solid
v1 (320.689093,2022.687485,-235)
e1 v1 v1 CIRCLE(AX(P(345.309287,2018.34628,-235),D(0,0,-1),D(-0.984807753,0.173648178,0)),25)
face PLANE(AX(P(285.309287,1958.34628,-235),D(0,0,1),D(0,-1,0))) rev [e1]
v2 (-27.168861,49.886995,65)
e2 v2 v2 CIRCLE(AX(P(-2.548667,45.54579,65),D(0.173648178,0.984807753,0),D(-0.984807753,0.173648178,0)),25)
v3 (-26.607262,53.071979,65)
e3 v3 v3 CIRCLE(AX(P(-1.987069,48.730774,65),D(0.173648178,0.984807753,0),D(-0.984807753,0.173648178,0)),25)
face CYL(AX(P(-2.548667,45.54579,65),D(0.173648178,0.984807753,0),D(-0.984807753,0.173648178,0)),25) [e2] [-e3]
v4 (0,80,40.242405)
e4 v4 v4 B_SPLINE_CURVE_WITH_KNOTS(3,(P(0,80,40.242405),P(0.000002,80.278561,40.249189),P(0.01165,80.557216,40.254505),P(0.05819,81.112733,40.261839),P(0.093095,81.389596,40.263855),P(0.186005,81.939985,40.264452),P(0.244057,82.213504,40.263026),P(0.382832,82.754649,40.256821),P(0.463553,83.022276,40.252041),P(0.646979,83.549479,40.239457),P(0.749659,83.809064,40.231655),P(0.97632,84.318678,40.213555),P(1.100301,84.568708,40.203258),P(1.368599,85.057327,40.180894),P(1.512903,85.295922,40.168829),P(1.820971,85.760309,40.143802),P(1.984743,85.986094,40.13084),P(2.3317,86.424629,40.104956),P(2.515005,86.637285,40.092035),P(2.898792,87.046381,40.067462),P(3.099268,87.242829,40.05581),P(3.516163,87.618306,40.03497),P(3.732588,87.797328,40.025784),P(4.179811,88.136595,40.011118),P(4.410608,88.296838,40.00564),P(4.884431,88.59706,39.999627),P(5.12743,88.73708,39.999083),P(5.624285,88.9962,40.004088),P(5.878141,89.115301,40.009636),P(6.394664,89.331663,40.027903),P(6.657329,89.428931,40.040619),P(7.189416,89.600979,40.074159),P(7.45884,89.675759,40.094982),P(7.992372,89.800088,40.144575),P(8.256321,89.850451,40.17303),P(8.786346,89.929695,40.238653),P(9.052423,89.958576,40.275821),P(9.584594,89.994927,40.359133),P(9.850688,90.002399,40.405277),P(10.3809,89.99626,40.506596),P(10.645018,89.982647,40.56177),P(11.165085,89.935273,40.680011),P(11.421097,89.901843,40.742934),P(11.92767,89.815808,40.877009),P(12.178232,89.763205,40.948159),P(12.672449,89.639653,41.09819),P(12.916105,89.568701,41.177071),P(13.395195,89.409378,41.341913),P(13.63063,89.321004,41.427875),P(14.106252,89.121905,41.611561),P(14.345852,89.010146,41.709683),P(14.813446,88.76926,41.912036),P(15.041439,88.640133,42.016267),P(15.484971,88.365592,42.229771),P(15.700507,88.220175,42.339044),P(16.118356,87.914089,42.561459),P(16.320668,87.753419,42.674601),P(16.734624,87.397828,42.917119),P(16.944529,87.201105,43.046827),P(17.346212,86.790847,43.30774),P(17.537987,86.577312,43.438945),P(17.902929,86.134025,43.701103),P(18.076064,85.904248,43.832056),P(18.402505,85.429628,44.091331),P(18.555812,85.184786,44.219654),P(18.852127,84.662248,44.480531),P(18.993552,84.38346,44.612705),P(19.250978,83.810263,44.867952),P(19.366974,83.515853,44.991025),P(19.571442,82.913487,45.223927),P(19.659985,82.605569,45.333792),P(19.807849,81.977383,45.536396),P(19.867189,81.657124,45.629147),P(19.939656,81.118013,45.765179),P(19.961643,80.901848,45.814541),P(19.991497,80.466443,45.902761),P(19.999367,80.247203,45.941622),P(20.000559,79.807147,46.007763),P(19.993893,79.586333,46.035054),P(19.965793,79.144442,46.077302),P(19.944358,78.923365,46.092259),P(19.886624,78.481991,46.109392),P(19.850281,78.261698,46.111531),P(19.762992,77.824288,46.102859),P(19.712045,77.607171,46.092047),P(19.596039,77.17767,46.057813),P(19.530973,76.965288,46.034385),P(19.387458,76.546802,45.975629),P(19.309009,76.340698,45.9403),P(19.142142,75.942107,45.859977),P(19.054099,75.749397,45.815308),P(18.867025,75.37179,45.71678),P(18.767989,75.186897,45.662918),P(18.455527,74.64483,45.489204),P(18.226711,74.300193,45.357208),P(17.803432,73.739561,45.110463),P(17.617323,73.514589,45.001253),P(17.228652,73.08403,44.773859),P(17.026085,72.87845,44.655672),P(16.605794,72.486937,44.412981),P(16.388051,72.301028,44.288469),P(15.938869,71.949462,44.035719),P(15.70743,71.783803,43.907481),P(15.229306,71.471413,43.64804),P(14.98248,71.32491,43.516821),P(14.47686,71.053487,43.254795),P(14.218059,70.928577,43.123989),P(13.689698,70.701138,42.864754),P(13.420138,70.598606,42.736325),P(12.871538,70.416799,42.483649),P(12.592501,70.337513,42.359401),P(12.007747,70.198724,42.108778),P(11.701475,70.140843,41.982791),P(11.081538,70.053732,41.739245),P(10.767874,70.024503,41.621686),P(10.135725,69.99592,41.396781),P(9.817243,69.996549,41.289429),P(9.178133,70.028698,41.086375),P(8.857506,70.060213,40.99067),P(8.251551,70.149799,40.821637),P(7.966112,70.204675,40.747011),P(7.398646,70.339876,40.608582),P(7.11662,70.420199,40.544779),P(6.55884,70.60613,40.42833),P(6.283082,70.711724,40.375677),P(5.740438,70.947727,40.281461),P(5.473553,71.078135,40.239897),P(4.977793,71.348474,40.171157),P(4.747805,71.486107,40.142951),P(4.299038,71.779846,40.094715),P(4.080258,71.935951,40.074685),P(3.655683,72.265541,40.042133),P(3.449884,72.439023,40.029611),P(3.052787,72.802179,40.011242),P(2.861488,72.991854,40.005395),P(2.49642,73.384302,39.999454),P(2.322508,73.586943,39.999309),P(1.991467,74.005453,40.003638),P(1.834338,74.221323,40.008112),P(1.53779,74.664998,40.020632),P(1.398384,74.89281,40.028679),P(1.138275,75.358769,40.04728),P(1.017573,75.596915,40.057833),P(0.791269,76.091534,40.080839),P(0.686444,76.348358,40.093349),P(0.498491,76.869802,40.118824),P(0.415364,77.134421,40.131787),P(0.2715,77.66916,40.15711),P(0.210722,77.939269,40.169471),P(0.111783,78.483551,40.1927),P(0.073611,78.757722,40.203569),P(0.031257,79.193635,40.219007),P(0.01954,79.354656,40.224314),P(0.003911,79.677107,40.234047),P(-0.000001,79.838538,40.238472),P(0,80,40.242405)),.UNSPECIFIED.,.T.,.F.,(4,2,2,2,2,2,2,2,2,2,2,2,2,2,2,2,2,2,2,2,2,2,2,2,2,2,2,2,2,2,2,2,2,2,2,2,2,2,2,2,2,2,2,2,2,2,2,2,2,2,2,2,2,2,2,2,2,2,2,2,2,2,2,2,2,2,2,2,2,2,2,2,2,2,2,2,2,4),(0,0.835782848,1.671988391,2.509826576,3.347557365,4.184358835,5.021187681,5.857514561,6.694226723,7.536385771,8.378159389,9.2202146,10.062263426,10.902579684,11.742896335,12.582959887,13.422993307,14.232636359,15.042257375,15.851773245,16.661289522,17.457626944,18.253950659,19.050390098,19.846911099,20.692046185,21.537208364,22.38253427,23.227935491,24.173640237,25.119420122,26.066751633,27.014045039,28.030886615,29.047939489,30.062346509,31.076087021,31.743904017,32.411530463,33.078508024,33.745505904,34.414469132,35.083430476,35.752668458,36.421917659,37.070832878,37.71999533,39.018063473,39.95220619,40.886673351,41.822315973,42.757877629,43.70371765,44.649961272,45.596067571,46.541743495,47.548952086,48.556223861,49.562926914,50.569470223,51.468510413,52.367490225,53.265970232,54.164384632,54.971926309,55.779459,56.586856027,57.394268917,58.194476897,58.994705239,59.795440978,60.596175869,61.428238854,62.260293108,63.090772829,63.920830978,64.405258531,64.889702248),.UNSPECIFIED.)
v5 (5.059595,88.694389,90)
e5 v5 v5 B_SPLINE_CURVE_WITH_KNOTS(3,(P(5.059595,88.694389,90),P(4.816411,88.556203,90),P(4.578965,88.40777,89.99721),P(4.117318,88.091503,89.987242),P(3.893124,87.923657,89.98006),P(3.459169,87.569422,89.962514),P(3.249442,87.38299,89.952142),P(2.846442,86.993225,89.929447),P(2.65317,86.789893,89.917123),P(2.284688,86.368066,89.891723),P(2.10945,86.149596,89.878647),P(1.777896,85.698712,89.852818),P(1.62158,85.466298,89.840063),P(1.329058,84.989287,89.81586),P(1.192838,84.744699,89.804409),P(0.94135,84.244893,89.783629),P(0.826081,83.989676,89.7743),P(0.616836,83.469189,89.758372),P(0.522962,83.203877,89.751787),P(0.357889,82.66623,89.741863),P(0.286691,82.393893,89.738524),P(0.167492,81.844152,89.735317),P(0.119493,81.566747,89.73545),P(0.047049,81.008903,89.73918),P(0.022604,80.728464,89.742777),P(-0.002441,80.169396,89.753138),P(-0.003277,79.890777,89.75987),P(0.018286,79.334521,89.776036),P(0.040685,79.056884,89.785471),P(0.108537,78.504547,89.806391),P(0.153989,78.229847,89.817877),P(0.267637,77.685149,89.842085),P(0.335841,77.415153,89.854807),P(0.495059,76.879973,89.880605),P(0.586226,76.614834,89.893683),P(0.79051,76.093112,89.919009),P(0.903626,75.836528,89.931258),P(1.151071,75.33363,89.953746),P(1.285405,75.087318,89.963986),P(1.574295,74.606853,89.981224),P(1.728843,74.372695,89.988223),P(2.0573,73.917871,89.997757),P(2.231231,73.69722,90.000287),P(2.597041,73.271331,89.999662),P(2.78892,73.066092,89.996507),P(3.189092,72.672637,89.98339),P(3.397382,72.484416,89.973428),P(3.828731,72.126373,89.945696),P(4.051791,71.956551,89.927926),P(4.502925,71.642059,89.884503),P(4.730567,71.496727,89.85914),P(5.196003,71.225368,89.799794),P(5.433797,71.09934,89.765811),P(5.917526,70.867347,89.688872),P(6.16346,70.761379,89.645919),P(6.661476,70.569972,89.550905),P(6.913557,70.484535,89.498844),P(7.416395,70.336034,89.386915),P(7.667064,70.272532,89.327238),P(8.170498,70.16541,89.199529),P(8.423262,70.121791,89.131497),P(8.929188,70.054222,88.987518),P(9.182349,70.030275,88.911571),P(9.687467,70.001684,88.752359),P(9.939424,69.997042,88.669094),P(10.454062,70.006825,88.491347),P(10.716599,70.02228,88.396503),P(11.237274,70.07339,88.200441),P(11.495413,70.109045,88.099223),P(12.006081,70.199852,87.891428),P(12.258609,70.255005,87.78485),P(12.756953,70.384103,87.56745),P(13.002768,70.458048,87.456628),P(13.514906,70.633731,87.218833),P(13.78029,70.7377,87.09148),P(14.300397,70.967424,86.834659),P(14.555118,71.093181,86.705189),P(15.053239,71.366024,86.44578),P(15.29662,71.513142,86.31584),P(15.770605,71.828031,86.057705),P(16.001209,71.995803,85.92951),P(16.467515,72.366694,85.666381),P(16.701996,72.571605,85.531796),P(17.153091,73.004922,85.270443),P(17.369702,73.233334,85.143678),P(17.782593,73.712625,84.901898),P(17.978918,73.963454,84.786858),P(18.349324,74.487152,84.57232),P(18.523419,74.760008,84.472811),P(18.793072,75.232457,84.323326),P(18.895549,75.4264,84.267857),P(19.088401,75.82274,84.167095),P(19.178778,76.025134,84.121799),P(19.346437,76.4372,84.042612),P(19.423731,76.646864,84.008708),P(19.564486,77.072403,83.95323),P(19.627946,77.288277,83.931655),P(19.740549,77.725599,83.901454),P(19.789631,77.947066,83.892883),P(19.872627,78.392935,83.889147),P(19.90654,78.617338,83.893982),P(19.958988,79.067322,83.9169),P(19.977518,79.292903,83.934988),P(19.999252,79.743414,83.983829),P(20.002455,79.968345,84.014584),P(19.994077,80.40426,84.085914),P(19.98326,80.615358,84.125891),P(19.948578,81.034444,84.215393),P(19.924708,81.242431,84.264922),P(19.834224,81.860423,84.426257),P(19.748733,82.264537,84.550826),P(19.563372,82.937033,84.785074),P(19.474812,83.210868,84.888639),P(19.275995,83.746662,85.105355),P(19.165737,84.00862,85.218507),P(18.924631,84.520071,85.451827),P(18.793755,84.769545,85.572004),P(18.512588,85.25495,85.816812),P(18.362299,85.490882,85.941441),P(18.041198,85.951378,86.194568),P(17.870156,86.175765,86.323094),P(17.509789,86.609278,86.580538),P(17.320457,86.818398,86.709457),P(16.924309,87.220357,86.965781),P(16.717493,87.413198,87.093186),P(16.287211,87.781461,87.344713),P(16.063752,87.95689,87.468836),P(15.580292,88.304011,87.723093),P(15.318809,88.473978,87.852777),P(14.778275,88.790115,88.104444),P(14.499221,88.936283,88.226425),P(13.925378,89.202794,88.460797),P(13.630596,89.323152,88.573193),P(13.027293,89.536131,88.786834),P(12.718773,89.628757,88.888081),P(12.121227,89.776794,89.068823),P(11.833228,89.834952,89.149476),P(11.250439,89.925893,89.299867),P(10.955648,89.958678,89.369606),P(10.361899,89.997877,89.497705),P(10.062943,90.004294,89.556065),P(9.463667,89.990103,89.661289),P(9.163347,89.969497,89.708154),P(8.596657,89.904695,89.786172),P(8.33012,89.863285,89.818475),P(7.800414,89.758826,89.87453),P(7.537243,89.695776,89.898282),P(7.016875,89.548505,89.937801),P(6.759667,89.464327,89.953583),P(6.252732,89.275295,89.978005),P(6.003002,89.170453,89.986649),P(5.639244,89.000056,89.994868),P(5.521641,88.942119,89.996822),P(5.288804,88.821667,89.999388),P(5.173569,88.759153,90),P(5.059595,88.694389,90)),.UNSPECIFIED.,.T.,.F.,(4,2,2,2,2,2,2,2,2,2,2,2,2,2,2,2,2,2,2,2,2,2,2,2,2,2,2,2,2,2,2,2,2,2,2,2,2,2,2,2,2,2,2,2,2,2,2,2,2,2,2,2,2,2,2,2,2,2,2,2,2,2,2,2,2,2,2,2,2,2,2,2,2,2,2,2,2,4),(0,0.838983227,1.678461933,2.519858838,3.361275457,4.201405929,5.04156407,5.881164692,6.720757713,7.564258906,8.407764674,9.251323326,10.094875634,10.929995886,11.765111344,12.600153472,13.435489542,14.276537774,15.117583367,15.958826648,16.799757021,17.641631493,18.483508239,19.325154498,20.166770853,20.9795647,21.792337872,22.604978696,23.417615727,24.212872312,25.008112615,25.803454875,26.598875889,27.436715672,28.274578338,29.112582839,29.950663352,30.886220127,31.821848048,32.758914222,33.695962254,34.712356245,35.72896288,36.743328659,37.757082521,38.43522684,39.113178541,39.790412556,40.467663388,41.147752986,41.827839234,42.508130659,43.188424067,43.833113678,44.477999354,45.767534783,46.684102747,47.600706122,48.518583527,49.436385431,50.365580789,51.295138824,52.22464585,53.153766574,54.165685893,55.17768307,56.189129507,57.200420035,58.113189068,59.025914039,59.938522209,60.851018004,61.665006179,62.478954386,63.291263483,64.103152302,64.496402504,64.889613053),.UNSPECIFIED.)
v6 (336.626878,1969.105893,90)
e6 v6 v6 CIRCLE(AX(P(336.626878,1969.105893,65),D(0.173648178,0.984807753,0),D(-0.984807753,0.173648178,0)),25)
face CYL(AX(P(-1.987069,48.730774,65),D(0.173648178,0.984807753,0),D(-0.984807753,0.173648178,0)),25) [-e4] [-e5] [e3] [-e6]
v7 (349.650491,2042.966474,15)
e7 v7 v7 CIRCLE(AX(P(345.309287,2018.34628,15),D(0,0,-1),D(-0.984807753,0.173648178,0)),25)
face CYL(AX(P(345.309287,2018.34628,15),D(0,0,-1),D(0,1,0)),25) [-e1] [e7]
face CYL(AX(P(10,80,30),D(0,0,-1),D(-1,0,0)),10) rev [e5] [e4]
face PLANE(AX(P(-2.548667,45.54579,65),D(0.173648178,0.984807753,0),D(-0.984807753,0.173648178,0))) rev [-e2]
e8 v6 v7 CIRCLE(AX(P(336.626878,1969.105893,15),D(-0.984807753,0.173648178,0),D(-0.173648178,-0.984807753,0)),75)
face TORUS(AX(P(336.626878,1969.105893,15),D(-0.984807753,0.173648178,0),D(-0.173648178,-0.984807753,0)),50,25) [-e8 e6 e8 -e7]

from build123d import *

# Parameters (mm, degrees)
SKETCH1_W                      = 100
SKETCH1_H                      = 120
BOSS_EXTRUDE1_DEPTH            = 10
SKETCH2_W                      = 100
SKETCH2_H                      = 10
BOSS_EXTRUDE2_DEPTH            = 20
SKETCH3_W                      = 100
SKETCH3_H                      = 10
BOSS_EXTRUDE3_DEPTH            = 50
SKETCH4_W                      = 100
SKETCH4_H                      = 10
BOSS_EXTRUDE4_DEPTH            = 10
SWEEP4_PROFILE_R               = 25
SKETCH16_W                     = 120
SKETCH16_H                     = 120
BOSS_EXTRUDE5_DEPTH            = 5
SKETCH23_W                     = 2.5
SKETCH23_H                     = 90
F_5_0MM_DOWEL_HOLE1_AT_2_COUNT = 2
F_5_0MM_DOWEL_HOLE1_AT_2_PITCH = 80
F_5_0MM_DOWEL_HOLE1_AT_3_COUNT = 2
F_5_0MM_DOWEL_HOLE1_AT_3_PITCH = 120.415945788
F_5_0MM_DOWEL_HOLE1_AT_4_COUNT = 2
F_5_0MM_DOWEL_HOLE1_AT_4_PITCH = 90
F_5_0MM_DOWEL_HOLE2_AT_2_COUNT = 2
F_5_0MM_DOWEL_HOLE2_AT_2_PITCH = 110
F_5_0MM_DOWEL_HOLE2_AT_3_COUNT = 2
F_5_0MM_DOWEL_HOLE2_AT_3_PITCH = 155.563491861
F_5_0MM_DOWEL_HOLE2_AT_4_COUNT = 2
F_5_0MM_DOWEL_HOLE2_AT_4_PITCH = 110
SKETCH31_W                     = 10
SKETCH31_H                     = 60
SPLIT1_OUTLINE_W               = 100
SPLIT1_OUTLINE_H               = 170
SPLIT1_OUTLINE_R               = 10
SPLIT1_OUTLINE_R_2             = 2.5
SPLIT1_DEPTH                   = 40
SPLIT2_START                   = -240
SPLIT2_OUTLINE_W               = 120
SPLIT2_OUTLINE_H               = 120
SPLIT2_OUTLINE_R               = 2.5
SPLIT2_DEPTH                   = 5


# Read off the part's stored shape, not the designer's step: Split1, Split2
with BuildPart() as part:
    # Sketch1 → Boss-Extrude1 (new body)
    with BuildSketch(Plane.XY):
        Rectangle(SKETCH1_W, SKETCH1_H)
    extrude(amount=BOSS_EXTRUDE1_DEPTH)

    # Sketch2 → Boss-Extrude2 (add)
    with BuildSketch(Plane.XY.offset(10)):
        with Locations((0, 55)):
            Rectangle(SKETCH2_W, SKETCH2_H)
    extrude(amount=BOSS_EXTRUDE2_DEPTH)



with BuildPart() as body_2:
    # Sketch3 → Boss-Extrude3 (new body)
    with BuildSketch(Plane(origin=(0, 60, 0), x_dir=(1, 0, 0), z_dir=(0, 1, 0))):
        with Locations((0, -35)):
            Rectangle(SKETCH3_W, SKETCH3_H)
    extrude(amount=BOSS_EXTRUDE3_DEPTH)


with BuildPart() as part_1:
    add(part.part)

    add(body_2.part)  # Boss-Extrude4 merges body 2
    # Sketch4 → Boss-Extrude4 (add)
    with BuildSketch(Plane.XZ.offset(-60)):
        with Locations((0, 35)):
            Rectangle(SKETCH4_W, SKETCH4_H)
    extrude(amount=BOSS_EXTRUDE4_DEPTH)

    # Sketch23 → Ø5.0mm Dowel Hole1 (revolve, cut)
    with BuildSketch(Plane(origin=(40, 40, 0), x_dir=(0, 1, 0), z_dir=(1, 0, 0))):
        with Locations((1.25, 45)):
            Rectangle(SKETCH23_W, SKETCH23_H)
    f_5_0mm_dowel_hole1 = revolve(axis=Axis((40, 40, -6.35), (0, 0, 1)), mode=Mode.SUBTRACT)

    # Ø5.0mm Dowel Hole1 at 2: Ø5.0mm Dowel Hole1 ×2
    with Locations(*[(-i * F_5_0MM_DOWEL_HOLE1_AT_2_PITCH, 0, 0) for i in range(1, F_5_0MM_DOWEL_HOLE1_AT_2_COUNT)]):
        add(f_5_0mm_dowel_hole1, mode=Mode.SUBTRACT)

    # Ø5.0mm Dowel Hole1 at 3: Ø5.0mm Dowel Hole1 ×2
    with Locations(*[Vector(-0.6643638388299199, -0.7474093186836597, 0) * (i * F_5_0MM_DOWEL_HOLE1_AT_3_PITCH) for i in range(1, F_5_0MM_DOWEL_HOLE1_AT_3_COUNT)]):
        add(f_5_0mm_dowel_hole1, mode=Mode.SUBTRACT)

    # Ø5.0mm Dowel Hole1 at 4: Ø5.0mm Dowel Hole1 ×2
    with Locations(*[(0, -i * F_5_0MM_DOWEL_HOLE1_AT_4_PITCH, 0) for i in range(1, F_5_0MM_DOWEL_HOLE1_AT_4_COUNT)]):
        add(f_5_0mm_dowel_hole1, mode=Mode.SUBTRACT)


with BuildPart() as body_2_2:
    # Sweep4: sweep along a path in Sketch7
    with BuildLine(Plane(origin=(-10.2606043, 1.809221376, 0), x_dir=(0, 0, 1), z_dir=(-0.9848077530122091, 0.17364817766692414, 0))) as sweep4_path:
        Line((-235, 2047.645393419), (15, 2047.645393419))
        ThreePointArc((15, 2047.645393419), (50.355339059, 2033.000732479), (65, 1997.645393419))
        Line((65, 1997.645393419), (65, 47.645393419))
        Line((65, 47.645393419), (65, 44.411276158))
    # Sweep4 profile (on start of the path) → Sweep4 (sweep)
    with BuildSketch(Plane(origin=(345.309286776, 2018.346280235, -235), x_dir=(0, 1, 0), z_dir=(0, 0, 1))):
        Circle(SWEEP4_PROFILE_R)
    sweep(path=sweep4_path.line)

    # Sketch16 → Boss-Extrude5 (add)
    with BuildSketch(Plane(origin=(0, 0, -235), x_dir=(-1, 0, 0), z_dir=(0, 0, -1))):
        with Locations((-345.309286776, 2018.346280235)):
            Rectangle(SKETCH16_W, SKETCH16_H)
    extrude(amount=BOSS_EXTRUDE5_DEPTH)

    # Sketch28 → Ø5.0mm Dowel Hole2 (revolve, cut)
    with BuildSketch(Plane(origin=(400.309286776, 2073.346280235, -240), x_dir=(0, 1, 0), z_dir=(1, 0, 0))):
        Polygon((0, 0), (0, 21.502151548), (2.5, 20), (2.5, 0), align=None)
    f_5_0mm_dowel_hole2 = revolve(axis=Axis((400.309286776, 2073.346280235, -246.35), (0, 0, 1)), mode=Mode.SUBTRACT)

    # Ø5.0mm Dowel Hole2 at 2: Ø5.0mm Dowel Hole2 ×2
    with Locations(*[(-i * F_5_0MM_DOWEL_HOLE2_AT_2_PITCH, 0, 0) for i in range(1, F_5_0MM_DOWEL_HOLE2_AT_2_COUNT)]):
        add(f_5_0mm_dowel_hole2, mode=Mode.SUBTRACT)

    # Ø5.0mm Dowel Hole2 at 3: Ø5.0mm Dowel Hole2 ×2
    with Locations(*[Vector(-0.7071067811865461, -0.707106781186549, 0) * (i * F_5_0MM_DOWEL_HOLE2_AT_3_PITCH) for i in range(1, F_5_0MM_DOWEL_HOLE2_AT_3_COUNT)]):
        add(f_5_0mm_dowel_hole2, mode=Mode.SUBTRACT)

    # Ø5.0mm Dowel Hole2 at 4: Ø5.0mm Dowel Hole2 ×2
    with Locations(*[(0, -i * F_5_0MM_DOWEL_HOLE2_AT_4_PITCH, 0) for i in range(1, F_5_0MM_DOWEL_HOLE2_AT_4_COUNT)]):
        add(f_5_0mm_dowel_hole2, mode=Mode.SUBTRACT)


with BuildPart() as f_20_0mm_dowel_hole1_tool:
    # Sketch31 → Ø20.0mm Dowel Hole1 (revolve)
    with BuildSketch(Plane(origin=(10, 80, 30), x_dir=(0, 1, 0), z_dir=(1, 0, 0))):
        with Locations((5, 30)):
            Rectangle(SKETCH31_W, SKETCH31_H)
    revolve(axis=Axis((10, 80, 23.65), (0, 0, 1)))


with BuildPart() as part_2:
    add(part_1.part)

    # Ø20.0mm Dowel Hole1: cut by f_20_0mm_dowel_hole1_tool
    add(f_20_0mm_dowel_hole1_tool.part, mode=Mode.SUBTRACT)

    # Split1 outline → Split1 (cut)
    with BuildSketch(Plane.XY):
        with Locations((0, 25)):
            Rectangle(SPLIT1_OUTLINE_W, SPLIT1_OUTLINE_H)
        with Locations((10, 80)):
            Circle(SPLIT1_OUTLINE_R, mode=Mode.SUBTRACT)
        with Locations((40, 40)):
            Circle(SPLIT1_OUTLINE_R_2, mode=Mode.SUBTRACT)
        with Locations((-40, -50)):
            Circle(SPLIT1_OUTLINE_R_2, mode=Mode.SUBTRACT)
        with Locations((40, -50)):
            Circle(SPLIT1_OUTLINE_R_2, mode=Mode.SUBTRACT)
        with Locations((-40, 40)):
            Circle(SPLIT1_OUTLINE_R_2, mode=Mode.SUBTRACT)
    extrude(amount=SPLIT1_DEPTH, mode=Mode.SUBTRACT)


with BuildPart() as body_2_2_1:
    add(body_2_2.part)

    # Ø20.0mm Dowel Hole1: cut by f_20_0mm_dowel_hole1_tool
    add(f_20_0mm_dowel_hole1_tool.part, mode=Mode.SUBTRACT)

    # Split2 outline → Split2 (cut)
    with BuildSketch(Plane.XY.offset(SPLIT2_START)):
        with Locations((345.309286776, 2018.346280235)):
            Rectangle(SPLIT2_OUTLINE_W, SPLIT2_OUTLINE_H)
        with Locations((290.309286776, 1963.346280235)):
            Circle(SPLIT2_OUTLINE_R, mode=Mode.SUBTRACT)
        with Locations((400.309286776, 1963.346280235)):
            Circle(SPLIT2_OUTLINE_R, mode=Mode.SUBTRACT)
        with Locations((290.309286776, 2073.346280235)):
            Circle(SPLIT2_OUTLINE_R, mode=Mode.SUBTRACT)
        with Locations((400.309286776, 2073.346280235)):
            Circle(SPLIT2_OUTLINE_R, mode=Mode.SUBTRACT)
    extrude(amount=SPLIT2_DEPTH, mode=Mode.SUBTRACT)


solid = body_2_2_1.part
